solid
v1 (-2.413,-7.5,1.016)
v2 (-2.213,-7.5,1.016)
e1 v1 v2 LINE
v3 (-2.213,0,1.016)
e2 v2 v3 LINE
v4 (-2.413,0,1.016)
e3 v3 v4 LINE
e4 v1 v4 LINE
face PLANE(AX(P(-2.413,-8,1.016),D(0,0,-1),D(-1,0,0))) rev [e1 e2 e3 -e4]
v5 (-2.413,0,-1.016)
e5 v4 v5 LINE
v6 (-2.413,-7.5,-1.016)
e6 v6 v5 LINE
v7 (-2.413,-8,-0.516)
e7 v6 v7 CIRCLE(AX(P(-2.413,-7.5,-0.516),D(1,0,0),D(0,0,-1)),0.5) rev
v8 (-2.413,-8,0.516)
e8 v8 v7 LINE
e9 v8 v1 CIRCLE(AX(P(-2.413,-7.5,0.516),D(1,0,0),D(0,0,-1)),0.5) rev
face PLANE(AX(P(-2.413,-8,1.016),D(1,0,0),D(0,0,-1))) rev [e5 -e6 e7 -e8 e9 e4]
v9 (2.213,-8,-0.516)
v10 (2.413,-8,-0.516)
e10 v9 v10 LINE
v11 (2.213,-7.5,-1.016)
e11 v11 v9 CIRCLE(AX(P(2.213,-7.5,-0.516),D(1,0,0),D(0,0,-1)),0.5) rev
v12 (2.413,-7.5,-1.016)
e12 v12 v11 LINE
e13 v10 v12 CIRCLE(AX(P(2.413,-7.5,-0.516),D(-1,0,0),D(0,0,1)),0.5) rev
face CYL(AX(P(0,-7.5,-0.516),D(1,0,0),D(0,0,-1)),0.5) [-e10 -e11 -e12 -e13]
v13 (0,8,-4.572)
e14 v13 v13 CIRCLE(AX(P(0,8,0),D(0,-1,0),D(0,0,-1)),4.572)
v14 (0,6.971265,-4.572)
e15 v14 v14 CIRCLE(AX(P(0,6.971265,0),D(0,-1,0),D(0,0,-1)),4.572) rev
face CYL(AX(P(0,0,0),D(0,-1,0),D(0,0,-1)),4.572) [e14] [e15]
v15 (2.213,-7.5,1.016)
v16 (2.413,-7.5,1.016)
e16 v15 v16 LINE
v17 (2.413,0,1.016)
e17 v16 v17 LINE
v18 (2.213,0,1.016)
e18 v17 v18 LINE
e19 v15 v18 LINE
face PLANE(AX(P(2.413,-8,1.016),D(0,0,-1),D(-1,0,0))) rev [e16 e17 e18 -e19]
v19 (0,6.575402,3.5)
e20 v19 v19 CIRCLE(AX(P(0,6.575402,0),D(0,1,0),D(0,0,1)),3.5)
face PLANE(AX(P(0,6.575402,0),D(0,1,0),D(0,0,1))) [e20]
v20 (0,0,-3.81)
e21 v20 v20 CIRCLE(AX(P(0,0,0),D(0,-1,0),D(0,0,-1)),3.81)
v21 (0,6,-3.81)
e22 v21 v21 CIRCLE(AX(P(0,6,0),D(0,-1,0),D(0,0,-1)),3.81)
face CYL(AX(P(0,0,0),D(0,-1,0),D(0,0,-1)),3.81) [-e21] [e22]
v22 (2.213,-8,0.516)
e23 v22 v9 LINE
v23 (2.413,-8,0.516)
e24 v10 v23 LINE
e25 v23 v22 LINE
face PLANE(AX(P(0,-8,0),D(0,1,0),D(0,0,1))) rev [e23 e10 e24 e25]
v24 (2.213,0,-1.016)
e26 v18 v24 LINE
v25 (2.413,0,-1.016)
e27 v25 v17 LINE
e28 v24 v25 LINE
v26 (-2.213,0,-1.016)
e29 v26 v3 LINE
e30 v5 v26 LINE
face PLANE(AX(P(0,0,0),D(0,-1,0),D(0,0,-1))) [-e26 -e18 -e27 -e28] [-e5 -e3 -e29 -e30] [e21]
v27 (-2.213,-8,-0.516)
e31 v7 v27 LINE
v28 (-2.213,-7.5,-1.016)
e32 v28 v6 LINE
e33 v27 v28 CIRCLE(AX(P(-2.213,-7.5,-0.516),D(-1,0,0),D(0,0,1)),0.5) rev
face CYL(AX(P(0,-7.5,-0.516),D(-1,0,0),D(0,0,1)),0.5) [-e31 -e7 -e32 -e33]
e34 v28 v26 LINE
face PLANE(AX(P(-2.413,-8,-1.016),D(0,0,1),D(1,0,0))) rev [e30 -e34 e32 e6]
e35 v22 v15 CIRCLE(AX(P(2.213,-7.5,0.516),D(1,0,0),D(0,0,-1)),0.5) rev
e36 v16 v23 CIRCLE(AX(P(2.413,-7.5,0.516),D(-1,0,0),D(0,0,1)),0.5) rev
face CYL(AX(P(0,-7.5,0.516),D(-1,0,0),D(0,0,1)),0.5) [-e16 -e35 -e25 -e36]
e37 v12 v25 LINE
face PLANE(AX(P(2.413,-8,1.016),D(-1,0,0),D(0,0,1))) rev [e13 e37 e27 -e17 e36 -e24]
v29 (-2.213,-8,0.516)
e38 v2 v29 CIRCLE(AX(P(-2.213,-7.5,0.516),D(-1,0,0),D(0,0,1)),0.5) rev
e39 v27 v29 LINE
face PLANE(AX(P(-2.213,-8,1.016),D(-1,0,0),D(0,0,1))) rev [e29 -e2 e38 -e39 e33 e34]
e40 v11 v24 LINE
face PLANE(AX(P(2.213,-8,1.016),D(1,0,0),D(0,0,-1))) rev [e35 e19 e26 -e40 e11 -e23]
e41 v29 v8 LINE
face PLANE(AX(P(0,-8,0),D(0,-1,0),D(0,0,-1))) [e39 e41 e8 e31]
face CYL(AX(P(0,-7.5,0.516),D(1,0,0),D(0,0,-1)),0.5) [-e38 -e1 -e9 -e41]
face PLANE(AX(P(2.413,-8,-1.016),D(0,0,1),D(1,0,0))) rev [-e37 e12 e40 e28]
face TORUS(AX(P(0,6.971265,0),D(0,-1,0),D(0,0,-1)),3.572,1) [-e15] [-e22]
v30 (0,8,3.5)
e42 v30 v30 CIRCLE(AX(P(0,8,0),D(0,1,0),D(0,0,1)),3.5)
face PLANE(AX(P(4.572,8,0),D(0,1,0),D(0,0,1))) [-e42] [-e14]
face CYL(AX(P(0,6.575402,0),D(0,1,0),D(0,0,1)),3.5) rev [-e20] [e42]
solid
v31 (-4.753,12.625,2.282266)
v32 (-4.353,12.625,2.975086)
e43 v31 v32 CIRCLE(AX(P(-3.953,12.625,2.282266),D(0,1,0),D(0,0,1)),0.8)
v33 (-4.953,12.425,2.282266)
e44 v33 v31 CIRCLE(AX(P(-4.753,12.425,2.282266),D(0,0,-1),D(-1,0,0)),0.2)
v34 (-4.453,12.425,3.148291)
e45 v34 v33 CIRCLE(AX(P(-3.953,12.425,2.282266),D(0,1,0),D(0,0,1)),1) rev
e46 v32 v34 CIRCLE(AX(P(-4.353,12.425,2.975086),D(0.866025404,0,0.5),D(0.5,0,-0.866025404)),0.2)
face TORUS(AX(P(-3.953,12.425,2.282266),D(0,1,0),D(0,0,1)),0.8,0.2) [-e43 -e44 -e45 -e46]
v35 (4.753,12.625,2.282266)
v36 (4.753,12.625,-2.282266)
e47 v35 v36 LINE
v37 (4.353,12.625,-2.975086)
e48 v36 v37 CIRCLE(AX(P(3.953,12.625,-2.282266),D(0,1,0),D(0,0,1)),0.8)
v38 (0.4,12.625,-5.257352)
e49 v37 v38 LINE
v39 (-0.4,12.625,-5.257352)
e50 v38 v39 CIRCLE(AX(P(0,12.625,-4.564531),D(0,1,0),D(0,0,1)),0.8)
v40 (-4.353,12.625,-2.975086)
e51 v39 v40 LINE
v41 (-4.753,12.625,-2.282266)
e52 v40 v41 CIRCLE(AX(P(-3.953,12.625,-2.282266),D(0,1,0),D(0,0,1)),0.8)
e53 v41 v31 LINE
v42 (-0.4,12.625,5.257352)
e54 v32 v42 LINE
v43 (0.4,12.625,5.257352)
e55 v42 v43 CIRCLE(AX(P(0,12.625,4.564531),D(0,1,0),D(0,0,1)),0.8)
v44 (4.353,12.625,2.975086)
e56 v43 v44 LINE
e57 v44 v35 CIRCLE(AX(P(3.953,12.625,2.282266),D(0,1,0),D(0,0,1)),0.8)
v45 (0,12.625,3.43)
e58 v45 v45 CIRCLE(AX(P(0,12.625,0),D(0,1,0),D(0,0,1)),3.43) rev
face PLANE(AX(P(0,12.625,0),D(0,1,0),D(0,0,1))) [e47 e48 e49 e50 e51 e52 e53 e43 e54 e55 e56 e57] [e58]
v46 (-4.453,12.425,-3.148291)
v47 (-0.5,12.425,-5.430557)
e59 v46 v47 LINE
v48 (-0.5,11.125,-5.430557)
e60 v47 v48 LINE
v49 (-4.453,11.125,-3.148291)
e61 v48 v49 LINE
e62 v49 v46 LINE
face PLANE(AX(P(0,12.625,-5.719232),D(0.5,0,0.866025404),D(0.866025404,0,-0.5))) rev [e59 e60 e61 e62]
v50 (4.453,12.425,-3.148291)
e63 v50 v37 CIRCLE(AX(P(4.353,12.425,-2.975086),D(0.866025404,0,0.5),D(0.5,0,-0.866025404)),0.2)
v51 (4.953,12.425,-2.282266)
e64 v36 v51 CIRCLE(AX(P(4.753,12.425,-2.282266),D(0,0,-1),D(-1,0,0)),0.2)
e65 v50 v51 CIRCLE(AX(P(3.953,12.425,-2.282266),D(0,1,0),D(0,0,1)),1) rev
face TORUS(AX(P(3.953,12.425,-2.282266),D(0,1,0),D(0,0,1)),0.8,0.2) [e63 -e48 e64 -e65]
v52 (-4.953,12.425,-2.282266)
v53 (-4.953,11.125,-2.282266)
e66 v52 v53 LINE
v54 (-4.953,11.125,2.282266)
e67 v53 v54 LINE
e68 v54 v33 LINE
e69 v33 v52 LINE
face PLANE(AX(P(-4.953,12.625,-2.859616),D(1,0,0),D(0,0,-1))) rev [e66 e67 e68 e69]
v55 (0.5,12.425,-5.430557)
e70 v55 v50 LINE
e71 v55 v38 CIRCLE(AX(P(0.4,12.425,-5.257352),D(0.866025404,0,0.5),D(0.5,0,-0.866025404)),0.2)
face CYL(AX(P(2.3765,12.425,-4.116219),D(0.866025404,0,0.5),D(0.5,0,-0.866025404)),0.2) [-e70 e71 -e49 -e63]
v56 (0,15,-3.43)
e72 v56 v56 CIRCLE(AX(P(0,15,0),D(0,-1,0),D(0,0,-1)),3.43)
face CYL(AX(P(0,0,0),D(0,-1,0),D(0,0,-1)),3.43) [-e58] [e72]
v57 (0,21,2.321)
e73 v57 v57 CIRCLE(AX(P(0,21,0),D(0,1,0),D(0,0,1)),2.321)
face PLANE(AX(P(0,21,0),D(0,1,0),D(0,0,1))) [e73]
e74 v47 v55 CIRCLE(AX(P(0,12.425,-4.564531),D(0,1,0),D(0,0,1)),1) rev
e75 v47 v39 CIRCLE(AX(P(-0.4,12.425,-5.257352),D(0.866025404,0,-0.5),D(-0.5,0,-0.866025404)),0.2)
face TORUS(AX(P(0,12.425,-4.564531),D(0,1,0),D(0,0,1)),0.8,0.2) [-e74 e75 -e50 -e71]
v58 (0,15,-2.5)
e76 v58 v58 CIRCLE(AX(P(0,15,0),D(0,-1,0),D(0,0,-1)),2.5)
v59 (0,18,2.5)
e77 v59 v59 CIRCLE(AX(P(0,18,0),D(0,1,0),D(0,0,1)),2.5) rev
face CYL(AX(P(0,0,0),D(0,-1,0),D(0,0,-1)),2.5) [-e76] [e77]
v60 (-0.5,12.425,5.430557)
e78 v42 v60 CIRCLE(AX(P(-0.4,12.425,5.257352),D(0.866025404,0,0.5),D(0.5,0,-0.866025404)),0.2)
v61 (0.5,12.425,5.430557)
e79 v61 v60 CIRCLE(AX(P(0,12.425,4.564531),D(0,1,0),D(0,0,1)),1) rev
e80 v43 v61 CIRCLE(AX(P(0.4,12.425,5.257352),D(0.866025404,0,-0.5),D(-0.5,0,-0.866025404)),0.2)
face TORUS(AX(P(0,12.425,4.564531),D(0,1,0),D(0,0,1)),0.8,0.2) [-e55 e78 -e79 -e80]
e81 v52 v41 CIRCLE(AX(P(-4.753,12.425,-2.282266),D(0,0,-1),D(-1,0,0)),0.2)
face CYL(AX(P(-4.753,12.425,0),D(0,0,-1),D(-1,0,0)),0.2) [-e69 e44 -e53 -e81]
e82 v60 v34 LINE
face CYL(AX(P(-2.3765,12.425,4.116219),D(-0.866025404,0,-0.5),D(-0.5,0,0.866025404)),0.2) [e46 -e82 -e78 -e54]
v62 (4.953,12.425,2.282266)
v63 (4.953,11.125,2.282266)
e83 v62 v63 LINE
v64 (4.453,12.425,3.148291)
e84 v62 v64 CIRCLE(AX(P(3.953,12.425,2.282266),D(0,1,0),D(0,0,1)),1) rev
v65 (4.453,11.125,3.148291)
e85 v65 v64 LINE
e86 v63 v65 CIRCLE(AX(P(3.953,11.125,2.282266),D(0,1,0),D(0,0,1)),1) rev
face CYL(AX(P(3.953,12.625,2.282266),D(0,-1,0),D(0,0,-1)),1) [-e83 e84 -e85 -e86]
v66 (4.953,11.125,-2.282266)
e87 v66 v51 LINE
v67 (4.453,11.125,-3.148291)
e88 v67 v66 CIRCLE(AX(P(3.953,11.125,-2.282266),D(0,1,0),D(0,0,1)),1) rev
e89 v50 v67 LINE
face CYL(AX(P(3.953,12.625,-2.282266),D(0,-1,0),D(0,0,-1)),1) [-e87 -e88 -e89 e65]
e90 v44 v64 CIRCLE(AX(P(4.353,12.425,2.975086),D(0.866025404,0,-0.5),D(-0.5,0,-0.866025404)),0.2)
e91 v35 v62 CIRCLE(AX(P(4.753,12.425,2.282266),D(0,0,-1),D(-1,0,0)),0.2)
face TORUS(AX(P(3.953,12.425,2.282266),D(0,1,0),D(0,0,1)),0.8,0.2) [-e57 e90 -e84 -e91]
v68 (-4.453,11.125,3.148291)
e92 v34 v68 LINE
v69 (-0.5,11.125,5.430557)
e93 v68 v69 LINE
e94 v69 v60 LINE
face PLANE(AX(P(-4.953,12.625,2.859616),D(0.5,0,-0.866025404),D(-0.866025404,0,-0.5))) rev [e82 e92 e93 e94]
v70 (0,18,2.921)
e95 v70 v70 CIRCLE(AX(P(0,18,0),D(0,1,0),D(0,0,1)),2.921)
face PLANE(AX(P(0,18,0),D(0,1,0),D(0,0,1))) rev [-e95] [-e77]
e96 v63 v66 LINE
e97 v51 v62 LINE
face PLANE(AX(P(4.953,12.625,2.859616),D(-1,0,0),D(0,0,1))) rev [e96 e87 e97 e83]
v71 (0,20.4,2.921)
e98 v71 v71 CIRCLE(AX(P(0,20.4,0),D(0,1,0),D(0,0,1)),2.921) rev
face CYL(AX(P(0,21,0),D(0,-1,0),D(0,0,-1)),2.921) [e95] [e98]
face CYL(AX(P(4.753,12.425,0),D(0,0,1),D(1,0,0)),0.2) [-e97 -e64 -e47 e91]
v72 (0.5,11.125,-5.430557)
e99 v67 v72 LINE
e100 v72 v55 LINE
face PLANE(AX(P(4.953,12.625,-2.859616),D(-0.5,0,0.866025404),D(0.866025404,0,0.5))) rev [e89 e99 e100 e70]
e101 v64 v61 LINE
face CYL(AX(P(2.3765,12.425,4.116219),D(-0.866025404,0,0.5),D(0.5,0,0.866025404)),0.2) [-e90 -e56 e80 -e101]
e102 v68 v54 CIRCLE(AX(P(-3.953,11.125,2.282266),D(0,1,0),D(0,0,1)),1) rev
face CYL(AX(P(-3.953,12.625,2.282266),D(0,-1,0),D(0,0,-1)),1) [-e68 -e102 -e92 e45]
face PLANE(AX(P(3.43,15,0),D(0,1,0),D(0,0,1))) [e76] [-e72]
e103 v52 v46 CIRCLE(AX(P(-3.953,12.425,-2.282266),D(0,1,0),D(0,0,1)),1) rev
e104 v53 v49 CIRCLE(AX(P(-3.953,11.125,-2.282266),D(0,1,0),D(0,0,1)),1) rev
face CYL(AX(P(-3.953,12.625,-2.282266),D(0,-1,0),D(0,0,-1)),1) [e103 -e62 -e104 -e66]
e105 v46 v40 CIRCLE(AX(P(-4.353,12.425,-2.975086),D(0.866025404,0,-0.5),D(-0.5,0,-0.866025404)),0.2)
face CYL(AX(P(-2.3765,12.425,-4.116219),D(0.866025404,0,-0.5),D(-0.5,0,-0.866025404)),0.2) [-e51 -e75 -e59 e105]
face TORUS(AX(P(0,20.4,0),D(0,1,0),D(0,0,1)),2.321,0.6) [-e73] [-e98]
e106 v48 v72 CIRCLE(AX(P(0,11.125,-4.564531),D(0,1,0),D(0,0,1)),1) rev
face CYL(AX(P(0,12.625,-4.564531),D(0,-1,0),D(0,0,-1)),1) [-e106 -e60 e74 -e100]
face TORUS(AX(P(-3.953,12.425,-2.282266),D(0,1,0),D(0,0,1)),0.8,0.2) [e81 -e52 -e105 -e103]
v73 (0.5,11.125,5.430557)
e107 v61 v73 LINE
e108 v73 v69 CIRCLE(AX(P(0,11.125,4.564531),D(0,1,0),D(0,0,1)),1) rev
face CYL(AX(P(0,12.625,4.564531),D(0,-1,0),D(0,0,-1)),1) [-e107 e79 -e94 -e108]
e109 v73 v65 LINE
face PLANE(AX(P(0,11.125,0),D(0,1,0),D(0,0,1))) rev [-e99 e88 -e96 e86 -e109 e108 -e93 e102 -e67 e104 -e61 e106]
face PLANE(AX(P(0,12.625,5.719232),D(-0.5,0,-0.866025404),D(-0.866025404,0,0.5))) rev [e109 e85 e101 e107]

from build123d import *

# Parameters (mm, degrees)
SKETCH3_R              = 2.921
BOSS_EXTRUDE1_DEPTH    = 3
FILLET3_R              = 0.6
FILLET1_R              = 1
SKETCH4_W              = 0.2
SKETCH4_H              = 2.032
BOSS_EXTRUDE2_DEPTH    = 8
FILLET2_R              = 0.5
BOSS_EXTRUDE3_DEPTH    = 1.5
FILLET4_R              = 1
FILLET5_R              = 0.2
CUT_EXTRUDE4_START     = -4.549597879
CUT_EXTRUDE4_OUTLINE_R = 3.5
CUT_EXTRUDE4_DEPTH     = 4.549597879


with BuildPart() as part:
    # Sketch2 → Revolve1 (revolve)
    with BuildSketch(Plane.XY, mode=Mode.PRIVATE) as revolve1_sk:
        Polygon((0, 0), (3.81, 0), (3.81, 6), (4.572, 6), (4.572, 8), (3.43, 8), (3.43, 15), (2.5, 15), (2.5, 18), (0, 18), align=None)
    revolve(revolve1_sk.sketch.rotate(Axis((0, 0, 0), (0, 1, 0)), 90), axis=Axis((0, 0, 0), (0, 1, 0)))

    # Sketch3 → Boss-Extrude1 (add)
    with BuildSketch(Plane(origin=(0, 18, 0), x_dir=(1, 0, 0), z_dir=(0, 1, 0))):
        with Locations(Location((0, 0, 0), (0, 0, 270))):
            Circle(SKETCH3_R)
    extrude(amount=BOSS_EXTRUDE1_DEPTH)

    # Fillet3
    fillet3_edges = [part.edges().sort_by_distance(p)[0] for p in [
        (0, 21, -2.921),
    ]]
    fillet(fillet3_edges, radius=FILLET3_R)

    # Fillet1
    # the kernel refuses this fillet: 1 mm, written as the material it takes off along each edge
    with BuildSketch(Plane(origin=(0, 6, 0), x_dir=(0, 0, -1), z_dir=(1, 0, 0))) as fillet1_piece_1:
        with BuildLine():
            CenterArc((3.572, 0.971265154), FILLET1_R, 283.768528752, 76.231471248)
            Line((3.81, 0), (3.81476, -0.019425303))
            ThreePointArc((3.81476, -0.019425303), (4.191, -0.02), (4.572, -0.02))
            Line((4.572, -0.02), (4.592, 0))
            Line((4.592, 0), (4.592, 0.971265154))
            Line((4.592, 0.971265154), (4.572, 0.971265154))
        make_face()
    revolve(axis=Axis((0, 6, 0), (0, 1, 0)), mode=Mode.SUBTRACT)

    # Sketch4 → Boss-Extrude2 (add)
    with BuildSketch(Plane.XZ):
        with Locations((-2.313, 0)):
            Rectangle(SKETCH4_W, SKETCH4_H)
        with Locations((2.313, 0)):
            Rectangle(SKETCH4_W, SKETCH4_H)
    extrude(amount=BOSS_EXTRUDE2_DEPTH)

    # Fillet2
    fillet2_edges = [part.edges().sort_by_distance(p)[0] for p in [
        (-2.313, -8, -1.016),
        (-2.313, -8, 1.016),
        (2.313, -8, 1.016),
        (2.313, -8, -1.016),
    ]]
    fillet(fillet2_edges, radius=FILLET2_R)

    # Sketch5 → Boss-Extrude3 (add)
    with BuildSketch(Plane(origin=(0, 11.125, 0), x_dir=(1, 0, 0), z_dir=(0, 1, 0))):
        Polygon((-4.953, -2.859615883), (0, -5.719231767), (4.953, -2.859615883), (4.953, 2.859615883), (0, 5.719231767), (-4.953, 2.859615883), align=None)
    extrude(amount=BOSS_EXTRUDE3_DEPTH)

    # Fillet4
    fillet4_edges = [part.edges().sort_by_distance(p)[0] for p in [
        (-4.953, 11.875, -2.859615883),
        (-4.953, 11.875, 2.859615883),
        (0, 11.875, 5.719231767),
        (4.953, 11.875, 2.859615883),
        (4.953, 11.875, -2.859615883),
        (0, 11.875, -5.719231767),
    ]]
    fillet(fillet4_edges, radius=FILLET4_R)

    # Fillet5
    fillet5_edges = [part.edges().sort_by_distance(p)[0] for p in [
        (2.4765, 12.625, -4.289423825),
        (4.953, 12.625, 0),
        (-4.953, 12.625, 0),
        (-2.4765, 12.625, 4.289423825),
        (2.4765, 12.625, 4.289423825),
        (-2.4765, 12.625, -4.289423825),
        (0, 12.625, -5.564531228),
        (-4.819025404, 12.625, -2.782265614),
        (-4.819025404, 12.625, 2.782265614),
        (0, 12.625, 5.564531228),
        (4.819025404, 12.625, 2.782265614),
        (4.819025404, 12.625, -2.782265614),
    ]]
    fillet(fillet5_edges, radius=FILLET5_R)

    # Cut-Extrude4: read off the stored shape, not the designer's step
    # Cut-Extrude4 outline → Cut-Extrude4 (cut)
    with BuildSketch(Plane(origin=(164.73864921, 11.125, 74.332771541), x_dir=(-0.11726284884639014, 0, 0.9931009134425507), z_dir=(0, 1, 0)).offset(CUT_EXTRUDE4_START)):
        with Locations((-54.502219995, -172.318575564)):
            Circle(CUT_EXTRUDE4_OUTLINE_R)
    extrude(amount=CUT_EXTRUDE4_DEPTH, mode=Mode.SUBTRACT)


solid = part.part
